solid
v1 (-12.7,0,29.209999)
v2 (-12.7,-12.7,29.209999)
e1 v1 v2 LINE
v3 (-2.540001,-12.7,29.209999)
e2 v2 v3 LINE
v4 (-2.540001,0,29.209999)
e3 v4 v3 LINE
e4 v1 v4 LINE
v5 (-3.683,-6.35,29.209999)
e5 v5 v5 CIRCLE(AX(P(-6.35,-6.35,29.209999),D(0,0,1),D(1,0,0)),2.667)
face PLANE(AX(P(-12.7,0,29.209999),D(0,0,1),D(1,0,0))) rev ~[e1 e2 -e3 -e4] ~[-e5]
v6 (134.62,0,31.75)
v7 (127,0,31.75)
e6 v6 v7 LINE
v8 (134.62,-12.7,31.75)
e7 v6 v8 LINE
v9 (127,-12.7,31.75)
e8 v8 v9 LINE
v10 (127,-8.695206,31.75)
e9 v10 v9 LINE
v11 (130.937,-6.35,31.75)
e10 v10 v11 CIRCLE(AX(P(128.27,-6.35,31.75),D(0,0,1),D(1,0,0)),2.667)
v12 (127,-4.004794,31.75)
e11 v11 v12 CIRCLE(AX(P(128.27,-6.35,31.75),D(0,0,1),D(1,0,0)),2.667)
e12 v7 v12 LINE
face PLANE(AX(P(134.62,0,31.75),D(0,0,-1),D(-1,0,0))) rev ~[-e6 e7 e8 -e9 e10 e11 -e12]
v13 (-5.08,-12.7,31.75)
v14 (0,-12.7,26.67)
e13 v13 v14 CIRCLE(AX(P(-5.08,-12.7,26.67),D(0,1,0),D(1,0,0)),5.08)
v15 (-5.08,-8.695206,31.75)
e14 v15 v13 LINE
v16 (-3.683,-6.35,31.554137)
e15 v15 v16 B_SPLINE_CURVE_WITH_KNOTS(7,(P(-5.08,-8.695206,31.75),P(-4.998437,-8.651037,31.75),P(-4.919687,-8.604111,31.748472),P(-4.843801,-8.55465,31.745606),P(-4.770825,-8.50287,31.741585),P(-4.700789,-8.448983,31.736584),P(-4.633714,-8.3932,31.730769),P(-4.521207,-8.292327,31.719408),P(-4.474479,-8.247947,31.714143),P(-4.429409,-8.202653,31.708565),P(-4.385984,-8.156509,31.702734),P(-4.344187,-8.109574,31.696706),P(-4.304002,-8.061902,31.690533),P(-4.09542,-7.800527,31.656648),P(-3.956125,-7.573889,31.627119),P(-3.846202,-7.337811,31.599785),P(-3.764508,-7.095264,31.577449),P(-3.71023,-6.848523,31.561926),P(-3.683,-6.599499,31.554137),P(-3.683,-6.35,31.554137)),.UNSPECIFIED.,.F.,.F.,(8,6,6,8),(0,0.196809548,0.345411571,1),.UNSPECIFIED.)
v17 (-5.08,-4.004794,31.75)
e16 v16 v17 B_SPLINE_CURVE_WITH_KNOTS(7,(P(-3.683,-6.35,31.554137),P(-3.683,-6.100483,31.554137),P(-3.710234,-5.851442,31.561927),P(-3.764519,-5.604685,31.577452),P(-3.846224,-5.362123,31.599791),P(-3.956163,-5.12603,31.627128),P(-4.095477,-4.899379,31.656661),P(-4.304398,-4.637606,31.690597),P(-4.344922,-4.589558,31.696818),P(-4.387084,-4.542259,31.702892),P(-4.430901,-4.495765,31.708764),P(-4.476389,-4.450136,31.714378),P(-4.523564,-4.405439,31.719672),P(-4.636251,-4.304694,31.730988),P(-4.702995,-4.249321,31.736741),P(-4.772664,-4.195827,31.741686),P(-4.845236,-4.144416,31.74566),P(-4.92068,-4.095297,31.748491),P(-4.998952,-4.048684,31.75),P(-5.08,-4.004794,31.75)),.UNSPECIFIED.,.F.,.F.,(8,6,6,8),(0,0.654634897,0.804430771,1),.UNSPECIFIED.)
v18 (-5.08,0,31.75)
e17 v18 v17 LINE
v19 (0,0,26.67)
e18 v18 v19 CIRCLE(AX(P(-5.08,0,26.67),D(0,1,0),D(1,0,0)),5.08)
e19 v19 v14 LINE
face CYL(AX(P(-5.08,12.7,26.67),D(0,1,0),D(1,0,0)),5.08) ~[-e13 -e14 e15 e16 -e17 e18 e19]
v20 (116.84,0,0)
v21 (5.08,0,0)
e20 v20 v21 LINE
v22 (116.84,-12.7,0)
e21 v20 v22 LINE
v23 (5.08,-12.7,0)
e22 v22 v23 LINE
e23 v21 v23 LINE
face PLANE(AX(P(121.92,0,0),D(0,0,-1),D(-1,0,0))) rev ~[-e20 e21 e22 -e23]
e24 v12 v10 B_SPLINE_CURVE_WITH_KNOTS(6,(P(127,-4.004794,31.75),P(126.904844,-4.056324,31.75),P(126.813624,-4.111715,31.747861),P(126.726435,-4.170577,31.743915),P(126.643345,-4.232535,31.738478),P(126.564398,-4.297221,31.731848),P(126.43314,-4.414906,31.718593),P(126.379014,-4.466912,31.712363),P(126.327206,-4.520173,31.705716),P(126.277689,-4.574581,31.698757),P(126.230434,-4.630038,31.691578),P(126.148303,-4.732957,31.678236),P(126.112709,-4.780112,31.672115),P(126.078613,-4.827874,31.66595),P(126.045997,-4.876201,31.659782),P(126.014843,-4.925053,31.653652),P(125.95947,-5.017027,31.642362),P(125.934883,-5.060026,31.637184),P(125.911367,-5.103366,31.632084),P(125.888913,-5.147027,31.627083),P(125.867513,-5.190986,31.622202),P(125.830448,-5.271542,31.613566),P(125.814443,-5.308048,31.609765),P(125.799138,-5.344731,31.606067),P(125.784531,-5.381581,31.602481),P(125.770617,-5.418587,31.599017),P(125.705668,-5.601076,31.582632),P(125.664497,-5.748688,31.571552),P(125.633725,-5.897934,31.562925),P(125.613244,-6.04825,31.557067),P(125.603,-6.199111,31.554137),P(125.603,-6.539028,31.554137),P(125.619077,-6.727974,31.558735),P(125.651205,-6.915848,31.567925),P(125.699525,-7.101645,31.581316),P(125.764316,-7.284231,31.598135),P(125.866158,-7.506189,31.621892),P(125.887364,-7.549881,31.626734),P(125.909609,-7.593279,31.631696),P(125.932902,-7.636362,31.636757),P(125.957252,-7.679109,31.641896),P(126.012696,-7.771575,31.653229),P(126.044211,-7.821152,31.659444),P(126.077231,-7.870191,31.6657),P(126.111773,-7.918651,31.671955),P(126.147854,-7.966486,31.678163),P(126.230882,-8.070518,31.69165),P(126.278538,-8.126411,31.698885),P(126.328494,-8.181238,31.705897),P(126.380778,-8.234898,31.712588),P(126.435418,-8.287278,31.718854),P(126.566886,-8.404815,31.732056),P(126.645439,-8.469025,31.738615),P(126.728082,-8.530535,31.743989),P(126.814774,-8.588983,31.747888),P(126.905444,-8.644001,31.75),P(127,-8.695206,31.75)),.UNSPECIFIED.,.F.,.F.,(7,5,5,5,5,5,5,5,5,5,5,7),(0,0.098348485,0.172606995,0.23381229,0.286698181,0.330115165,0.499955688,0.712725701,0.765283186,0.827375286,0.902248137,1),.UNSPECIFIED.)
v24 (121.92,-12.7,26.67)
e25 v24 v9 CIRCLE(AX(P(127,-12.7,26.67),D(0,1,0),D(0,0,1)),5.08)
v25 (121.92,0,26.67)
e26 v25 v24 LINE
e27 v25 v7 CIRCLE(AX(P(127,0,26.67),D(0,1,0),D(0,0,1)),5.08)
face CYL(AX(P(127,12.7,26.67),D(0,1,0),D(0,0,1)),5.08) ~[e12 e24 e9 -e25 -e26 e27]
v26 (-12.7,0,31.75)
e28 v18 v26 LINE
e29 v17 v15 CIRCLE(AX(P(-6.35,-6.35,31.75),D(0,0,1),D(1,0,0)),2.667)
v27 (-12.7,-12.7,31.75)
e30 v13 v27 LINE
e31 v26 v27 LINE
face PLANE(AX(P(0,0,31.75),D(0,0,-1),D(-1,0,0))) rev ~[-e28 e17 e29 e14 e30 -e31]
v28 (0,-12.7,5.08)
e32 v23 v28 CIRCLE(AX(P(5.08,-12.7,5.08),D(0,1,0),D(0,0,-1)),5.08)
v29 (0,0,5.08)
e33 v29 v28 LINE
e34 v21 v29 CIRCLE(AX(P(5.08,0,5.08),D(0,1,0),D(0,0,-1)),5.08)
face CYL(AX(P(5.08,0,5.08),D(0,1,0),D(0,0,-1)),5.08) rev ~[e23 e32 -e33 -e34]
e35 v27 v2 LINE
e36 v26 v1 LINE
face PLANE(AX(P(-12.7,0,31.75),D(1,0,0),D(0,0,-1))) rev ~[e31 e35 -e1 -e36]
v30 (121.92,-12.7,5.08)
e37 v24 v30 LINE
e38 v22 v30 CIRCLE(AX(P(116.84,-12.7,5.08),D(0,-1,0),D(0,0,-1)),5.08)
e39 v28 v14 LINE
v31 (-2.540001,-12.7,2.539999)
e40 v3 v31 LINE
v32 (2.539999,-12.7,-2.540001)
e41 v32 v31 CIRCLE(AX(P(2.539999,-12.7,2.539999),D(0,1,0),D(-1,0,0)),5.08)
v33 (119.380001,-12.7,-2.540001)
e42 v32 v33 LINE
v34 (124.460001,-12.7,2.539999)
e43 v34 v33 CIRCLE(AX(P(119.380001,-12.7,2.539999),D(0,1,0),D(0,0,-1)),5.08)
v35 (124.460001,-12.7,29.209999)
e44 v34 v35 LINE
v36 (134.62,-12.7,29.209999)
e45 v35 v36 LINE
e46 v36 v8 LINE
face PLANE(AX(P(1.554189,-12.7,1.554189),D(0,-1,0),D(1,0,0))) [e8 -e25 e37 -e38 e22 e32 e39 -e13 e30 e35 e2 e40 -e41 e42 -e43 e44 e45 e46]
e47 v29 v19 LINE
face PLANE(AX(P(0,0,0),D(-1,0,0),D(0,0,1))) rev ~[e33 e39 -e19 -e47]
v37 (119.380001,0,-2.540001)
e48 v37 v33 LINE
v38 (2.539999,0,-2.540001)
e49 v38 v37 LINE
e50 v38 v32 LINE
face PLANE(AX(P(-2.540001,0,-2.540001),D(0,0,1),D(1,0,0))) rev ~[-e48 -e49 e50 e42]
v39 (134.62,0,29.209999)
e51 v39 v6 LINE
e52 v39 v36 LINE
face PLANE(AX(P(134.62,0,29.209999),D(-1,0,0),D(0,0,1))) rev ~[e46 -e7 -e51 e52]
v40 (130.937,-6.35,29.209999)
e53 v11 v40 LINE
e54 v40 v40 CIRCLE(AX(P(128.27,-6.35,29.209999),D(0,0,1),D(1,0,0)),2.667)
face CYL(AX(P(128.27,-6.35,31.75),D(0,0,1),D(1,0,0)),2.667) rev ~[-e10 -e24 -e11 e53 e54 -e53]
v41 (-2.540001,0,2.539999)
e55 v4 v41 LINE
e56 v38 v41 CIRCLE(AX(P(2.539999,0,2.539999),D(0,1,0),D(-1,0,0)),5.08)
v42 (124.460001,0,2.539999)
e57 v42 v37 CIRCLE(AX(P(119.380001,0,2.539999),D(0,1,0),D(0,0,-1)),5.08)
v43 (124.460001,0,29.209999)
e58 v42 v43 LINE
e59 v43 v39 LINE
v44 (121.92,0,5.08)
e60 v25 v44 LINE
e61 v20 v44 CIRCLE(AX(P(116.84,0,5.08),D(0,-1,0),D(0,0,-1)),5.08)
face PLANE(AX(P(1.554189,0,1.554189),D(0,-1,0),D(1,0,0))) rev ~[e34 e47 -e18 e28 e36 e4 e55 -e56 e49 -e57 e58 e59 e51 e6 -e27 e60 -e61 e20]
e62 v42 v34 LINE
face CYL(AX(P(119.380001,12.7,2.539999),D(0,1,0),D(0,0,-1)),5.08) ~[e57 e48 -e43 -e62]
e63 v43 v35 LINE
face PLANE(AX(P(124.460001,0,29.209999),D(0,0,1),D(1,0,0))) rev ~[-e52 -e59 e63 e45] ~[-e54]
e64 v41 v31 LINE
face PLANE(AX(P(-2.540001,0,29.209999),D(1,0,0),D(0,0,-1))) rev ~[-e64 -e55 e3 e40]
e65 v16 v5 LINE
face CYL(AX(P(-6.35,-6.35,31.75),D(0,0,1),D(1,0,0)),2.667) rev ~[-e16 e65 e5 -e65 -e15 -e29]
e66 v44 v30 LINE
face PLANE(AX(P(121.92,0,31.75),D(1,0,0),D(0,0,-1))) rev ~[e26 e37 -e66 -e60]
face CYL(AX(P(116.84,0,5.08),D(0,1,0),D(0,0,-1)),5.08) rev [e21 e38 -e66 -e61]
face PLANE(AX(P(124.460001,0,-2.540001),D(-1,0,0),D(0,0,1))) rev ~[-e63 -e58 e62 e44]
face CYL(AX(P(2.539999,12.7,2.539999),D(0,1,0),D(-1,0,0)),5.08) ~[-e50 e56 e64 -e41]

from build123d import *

# Parameters (mm, degrees)
F1_DEPTH    = 12.7
F2_R        = 2.667
F3_R        = 2.667
F4_DEPTH    = 25.4
F5_T1_DEPTH = 12.7
F5_T3_DEPTH = 38.1


# Not quite as in the source:
# - a fillet or chamfer that OpenCascade refuses, or shapes differently, is made with other operations: its cross-section is extruded or revolved along the edge and cut away or added


with BuildPart() as f1:
    # F0 (on Front) → F1 (new body)
    with BuildSketch(Plane.XZ):
        Polygon((121.92, 0), (0, 0), (0, 31.75), (-12.7, 31.75), (-12.7, 29.2099993676), (-2.5400006324, 29.2099993676), (-2.5400006324, -2.5400006324), (124.4600006324, -2.5400006324), (124.4600006324, 29.2099993676), (134.62, 29.2099993676), (134.62, 31.75), (121.92, 31.75), align=None)
    extrude(amount=F1_DEPTH)

    # F2 (on face) + F3 (on face) → F4 (cut)
    with BuildSketch(Plane.XY.offset(31.75)):
        with Locations((-6.35, -6.35)):
            Circle(F2_R)
    with BuildSketch(Plane.XY.offset(31.75)):
        with Locations((128.27, -6.35)):
            Circle(F3_R)
    extrude(amount=-F4_DEPTH, mode=Mode.SUBTRACT)

    # F5: fillet of radius 5.08 on 6 edges, made by hand

    # F5_s2 → F5_t1 (join)
    with BuildSketch(Plane.XZ):
        with BuildLine():
            ThreePointArc((5.08, 0), (1.4878975516, 1.4878975516), (0, 5.08))
            Line((0, 5.08), (0, 0))
            Line((0, 0), (5.08, 0))
        make_face()
        with BuildLine():
            ThreePointArc((116.84, 0), (120.4321024484, 1.4878975516), (121.92, 5.08))
            Line((121.92, 5.08), (121.92, 0))
            Line((121.92, 0), (116.84, 0))
        make_face()
    extrude(amount=F5_T1_DEPTH)

    # F5_s4 → F5_t3 (cut)
    with BuildSketch(Plane.XZ.offset(-12.7)):
        with BuildLine():
            ThreePointArc((-2.5400006324, 2.5399993676), (-1.0521030808, -1.0521030808), (2.5399993676, -2.5400006324))
            Line((2.5399993676, -2.5400006324), (-2.5400006324, -2.5400006324))
            Line((-2.5400006324, -2.5400006324), (-2.5400006324, 2.5399993676))
        make_face()
        with BuildLine():
            ThreePointArc((119.3800006324, -2.5400006324), (122.9721030808, -1.0521030808), (124.4600006324, 2.5399993676))
            Line((124.4600006324, 2.5399993676), (124.4600006324, -2.5400006324))
            Line((124.4600006324, -2.5400006324), (119.3800006324, -2.5400006324))
        make_face()
        with BuildLine():
            ThreePointArc((127, 31.75), (123.4078975516, 30.2621024484), (121.92, 26.67))
            Line((121.92, 26.67), (121.92, 31.75))
            Line((121.92, 31.75), (127, 31.75))
        make_face()
        with BuildLine():
            ThreePointArc((0, 26.67), (-1.4878975516, 30.2621024484), (-5.08, 31.75))
            Line((-5.08, 31.75), (0, 31.75))
            Line((0, 31.75), (0, 26.67))
        make_face()
    extrude(amount=F5_T3_DEPTH, mode=Mode.SUBTRACT)


solid = f1.part
